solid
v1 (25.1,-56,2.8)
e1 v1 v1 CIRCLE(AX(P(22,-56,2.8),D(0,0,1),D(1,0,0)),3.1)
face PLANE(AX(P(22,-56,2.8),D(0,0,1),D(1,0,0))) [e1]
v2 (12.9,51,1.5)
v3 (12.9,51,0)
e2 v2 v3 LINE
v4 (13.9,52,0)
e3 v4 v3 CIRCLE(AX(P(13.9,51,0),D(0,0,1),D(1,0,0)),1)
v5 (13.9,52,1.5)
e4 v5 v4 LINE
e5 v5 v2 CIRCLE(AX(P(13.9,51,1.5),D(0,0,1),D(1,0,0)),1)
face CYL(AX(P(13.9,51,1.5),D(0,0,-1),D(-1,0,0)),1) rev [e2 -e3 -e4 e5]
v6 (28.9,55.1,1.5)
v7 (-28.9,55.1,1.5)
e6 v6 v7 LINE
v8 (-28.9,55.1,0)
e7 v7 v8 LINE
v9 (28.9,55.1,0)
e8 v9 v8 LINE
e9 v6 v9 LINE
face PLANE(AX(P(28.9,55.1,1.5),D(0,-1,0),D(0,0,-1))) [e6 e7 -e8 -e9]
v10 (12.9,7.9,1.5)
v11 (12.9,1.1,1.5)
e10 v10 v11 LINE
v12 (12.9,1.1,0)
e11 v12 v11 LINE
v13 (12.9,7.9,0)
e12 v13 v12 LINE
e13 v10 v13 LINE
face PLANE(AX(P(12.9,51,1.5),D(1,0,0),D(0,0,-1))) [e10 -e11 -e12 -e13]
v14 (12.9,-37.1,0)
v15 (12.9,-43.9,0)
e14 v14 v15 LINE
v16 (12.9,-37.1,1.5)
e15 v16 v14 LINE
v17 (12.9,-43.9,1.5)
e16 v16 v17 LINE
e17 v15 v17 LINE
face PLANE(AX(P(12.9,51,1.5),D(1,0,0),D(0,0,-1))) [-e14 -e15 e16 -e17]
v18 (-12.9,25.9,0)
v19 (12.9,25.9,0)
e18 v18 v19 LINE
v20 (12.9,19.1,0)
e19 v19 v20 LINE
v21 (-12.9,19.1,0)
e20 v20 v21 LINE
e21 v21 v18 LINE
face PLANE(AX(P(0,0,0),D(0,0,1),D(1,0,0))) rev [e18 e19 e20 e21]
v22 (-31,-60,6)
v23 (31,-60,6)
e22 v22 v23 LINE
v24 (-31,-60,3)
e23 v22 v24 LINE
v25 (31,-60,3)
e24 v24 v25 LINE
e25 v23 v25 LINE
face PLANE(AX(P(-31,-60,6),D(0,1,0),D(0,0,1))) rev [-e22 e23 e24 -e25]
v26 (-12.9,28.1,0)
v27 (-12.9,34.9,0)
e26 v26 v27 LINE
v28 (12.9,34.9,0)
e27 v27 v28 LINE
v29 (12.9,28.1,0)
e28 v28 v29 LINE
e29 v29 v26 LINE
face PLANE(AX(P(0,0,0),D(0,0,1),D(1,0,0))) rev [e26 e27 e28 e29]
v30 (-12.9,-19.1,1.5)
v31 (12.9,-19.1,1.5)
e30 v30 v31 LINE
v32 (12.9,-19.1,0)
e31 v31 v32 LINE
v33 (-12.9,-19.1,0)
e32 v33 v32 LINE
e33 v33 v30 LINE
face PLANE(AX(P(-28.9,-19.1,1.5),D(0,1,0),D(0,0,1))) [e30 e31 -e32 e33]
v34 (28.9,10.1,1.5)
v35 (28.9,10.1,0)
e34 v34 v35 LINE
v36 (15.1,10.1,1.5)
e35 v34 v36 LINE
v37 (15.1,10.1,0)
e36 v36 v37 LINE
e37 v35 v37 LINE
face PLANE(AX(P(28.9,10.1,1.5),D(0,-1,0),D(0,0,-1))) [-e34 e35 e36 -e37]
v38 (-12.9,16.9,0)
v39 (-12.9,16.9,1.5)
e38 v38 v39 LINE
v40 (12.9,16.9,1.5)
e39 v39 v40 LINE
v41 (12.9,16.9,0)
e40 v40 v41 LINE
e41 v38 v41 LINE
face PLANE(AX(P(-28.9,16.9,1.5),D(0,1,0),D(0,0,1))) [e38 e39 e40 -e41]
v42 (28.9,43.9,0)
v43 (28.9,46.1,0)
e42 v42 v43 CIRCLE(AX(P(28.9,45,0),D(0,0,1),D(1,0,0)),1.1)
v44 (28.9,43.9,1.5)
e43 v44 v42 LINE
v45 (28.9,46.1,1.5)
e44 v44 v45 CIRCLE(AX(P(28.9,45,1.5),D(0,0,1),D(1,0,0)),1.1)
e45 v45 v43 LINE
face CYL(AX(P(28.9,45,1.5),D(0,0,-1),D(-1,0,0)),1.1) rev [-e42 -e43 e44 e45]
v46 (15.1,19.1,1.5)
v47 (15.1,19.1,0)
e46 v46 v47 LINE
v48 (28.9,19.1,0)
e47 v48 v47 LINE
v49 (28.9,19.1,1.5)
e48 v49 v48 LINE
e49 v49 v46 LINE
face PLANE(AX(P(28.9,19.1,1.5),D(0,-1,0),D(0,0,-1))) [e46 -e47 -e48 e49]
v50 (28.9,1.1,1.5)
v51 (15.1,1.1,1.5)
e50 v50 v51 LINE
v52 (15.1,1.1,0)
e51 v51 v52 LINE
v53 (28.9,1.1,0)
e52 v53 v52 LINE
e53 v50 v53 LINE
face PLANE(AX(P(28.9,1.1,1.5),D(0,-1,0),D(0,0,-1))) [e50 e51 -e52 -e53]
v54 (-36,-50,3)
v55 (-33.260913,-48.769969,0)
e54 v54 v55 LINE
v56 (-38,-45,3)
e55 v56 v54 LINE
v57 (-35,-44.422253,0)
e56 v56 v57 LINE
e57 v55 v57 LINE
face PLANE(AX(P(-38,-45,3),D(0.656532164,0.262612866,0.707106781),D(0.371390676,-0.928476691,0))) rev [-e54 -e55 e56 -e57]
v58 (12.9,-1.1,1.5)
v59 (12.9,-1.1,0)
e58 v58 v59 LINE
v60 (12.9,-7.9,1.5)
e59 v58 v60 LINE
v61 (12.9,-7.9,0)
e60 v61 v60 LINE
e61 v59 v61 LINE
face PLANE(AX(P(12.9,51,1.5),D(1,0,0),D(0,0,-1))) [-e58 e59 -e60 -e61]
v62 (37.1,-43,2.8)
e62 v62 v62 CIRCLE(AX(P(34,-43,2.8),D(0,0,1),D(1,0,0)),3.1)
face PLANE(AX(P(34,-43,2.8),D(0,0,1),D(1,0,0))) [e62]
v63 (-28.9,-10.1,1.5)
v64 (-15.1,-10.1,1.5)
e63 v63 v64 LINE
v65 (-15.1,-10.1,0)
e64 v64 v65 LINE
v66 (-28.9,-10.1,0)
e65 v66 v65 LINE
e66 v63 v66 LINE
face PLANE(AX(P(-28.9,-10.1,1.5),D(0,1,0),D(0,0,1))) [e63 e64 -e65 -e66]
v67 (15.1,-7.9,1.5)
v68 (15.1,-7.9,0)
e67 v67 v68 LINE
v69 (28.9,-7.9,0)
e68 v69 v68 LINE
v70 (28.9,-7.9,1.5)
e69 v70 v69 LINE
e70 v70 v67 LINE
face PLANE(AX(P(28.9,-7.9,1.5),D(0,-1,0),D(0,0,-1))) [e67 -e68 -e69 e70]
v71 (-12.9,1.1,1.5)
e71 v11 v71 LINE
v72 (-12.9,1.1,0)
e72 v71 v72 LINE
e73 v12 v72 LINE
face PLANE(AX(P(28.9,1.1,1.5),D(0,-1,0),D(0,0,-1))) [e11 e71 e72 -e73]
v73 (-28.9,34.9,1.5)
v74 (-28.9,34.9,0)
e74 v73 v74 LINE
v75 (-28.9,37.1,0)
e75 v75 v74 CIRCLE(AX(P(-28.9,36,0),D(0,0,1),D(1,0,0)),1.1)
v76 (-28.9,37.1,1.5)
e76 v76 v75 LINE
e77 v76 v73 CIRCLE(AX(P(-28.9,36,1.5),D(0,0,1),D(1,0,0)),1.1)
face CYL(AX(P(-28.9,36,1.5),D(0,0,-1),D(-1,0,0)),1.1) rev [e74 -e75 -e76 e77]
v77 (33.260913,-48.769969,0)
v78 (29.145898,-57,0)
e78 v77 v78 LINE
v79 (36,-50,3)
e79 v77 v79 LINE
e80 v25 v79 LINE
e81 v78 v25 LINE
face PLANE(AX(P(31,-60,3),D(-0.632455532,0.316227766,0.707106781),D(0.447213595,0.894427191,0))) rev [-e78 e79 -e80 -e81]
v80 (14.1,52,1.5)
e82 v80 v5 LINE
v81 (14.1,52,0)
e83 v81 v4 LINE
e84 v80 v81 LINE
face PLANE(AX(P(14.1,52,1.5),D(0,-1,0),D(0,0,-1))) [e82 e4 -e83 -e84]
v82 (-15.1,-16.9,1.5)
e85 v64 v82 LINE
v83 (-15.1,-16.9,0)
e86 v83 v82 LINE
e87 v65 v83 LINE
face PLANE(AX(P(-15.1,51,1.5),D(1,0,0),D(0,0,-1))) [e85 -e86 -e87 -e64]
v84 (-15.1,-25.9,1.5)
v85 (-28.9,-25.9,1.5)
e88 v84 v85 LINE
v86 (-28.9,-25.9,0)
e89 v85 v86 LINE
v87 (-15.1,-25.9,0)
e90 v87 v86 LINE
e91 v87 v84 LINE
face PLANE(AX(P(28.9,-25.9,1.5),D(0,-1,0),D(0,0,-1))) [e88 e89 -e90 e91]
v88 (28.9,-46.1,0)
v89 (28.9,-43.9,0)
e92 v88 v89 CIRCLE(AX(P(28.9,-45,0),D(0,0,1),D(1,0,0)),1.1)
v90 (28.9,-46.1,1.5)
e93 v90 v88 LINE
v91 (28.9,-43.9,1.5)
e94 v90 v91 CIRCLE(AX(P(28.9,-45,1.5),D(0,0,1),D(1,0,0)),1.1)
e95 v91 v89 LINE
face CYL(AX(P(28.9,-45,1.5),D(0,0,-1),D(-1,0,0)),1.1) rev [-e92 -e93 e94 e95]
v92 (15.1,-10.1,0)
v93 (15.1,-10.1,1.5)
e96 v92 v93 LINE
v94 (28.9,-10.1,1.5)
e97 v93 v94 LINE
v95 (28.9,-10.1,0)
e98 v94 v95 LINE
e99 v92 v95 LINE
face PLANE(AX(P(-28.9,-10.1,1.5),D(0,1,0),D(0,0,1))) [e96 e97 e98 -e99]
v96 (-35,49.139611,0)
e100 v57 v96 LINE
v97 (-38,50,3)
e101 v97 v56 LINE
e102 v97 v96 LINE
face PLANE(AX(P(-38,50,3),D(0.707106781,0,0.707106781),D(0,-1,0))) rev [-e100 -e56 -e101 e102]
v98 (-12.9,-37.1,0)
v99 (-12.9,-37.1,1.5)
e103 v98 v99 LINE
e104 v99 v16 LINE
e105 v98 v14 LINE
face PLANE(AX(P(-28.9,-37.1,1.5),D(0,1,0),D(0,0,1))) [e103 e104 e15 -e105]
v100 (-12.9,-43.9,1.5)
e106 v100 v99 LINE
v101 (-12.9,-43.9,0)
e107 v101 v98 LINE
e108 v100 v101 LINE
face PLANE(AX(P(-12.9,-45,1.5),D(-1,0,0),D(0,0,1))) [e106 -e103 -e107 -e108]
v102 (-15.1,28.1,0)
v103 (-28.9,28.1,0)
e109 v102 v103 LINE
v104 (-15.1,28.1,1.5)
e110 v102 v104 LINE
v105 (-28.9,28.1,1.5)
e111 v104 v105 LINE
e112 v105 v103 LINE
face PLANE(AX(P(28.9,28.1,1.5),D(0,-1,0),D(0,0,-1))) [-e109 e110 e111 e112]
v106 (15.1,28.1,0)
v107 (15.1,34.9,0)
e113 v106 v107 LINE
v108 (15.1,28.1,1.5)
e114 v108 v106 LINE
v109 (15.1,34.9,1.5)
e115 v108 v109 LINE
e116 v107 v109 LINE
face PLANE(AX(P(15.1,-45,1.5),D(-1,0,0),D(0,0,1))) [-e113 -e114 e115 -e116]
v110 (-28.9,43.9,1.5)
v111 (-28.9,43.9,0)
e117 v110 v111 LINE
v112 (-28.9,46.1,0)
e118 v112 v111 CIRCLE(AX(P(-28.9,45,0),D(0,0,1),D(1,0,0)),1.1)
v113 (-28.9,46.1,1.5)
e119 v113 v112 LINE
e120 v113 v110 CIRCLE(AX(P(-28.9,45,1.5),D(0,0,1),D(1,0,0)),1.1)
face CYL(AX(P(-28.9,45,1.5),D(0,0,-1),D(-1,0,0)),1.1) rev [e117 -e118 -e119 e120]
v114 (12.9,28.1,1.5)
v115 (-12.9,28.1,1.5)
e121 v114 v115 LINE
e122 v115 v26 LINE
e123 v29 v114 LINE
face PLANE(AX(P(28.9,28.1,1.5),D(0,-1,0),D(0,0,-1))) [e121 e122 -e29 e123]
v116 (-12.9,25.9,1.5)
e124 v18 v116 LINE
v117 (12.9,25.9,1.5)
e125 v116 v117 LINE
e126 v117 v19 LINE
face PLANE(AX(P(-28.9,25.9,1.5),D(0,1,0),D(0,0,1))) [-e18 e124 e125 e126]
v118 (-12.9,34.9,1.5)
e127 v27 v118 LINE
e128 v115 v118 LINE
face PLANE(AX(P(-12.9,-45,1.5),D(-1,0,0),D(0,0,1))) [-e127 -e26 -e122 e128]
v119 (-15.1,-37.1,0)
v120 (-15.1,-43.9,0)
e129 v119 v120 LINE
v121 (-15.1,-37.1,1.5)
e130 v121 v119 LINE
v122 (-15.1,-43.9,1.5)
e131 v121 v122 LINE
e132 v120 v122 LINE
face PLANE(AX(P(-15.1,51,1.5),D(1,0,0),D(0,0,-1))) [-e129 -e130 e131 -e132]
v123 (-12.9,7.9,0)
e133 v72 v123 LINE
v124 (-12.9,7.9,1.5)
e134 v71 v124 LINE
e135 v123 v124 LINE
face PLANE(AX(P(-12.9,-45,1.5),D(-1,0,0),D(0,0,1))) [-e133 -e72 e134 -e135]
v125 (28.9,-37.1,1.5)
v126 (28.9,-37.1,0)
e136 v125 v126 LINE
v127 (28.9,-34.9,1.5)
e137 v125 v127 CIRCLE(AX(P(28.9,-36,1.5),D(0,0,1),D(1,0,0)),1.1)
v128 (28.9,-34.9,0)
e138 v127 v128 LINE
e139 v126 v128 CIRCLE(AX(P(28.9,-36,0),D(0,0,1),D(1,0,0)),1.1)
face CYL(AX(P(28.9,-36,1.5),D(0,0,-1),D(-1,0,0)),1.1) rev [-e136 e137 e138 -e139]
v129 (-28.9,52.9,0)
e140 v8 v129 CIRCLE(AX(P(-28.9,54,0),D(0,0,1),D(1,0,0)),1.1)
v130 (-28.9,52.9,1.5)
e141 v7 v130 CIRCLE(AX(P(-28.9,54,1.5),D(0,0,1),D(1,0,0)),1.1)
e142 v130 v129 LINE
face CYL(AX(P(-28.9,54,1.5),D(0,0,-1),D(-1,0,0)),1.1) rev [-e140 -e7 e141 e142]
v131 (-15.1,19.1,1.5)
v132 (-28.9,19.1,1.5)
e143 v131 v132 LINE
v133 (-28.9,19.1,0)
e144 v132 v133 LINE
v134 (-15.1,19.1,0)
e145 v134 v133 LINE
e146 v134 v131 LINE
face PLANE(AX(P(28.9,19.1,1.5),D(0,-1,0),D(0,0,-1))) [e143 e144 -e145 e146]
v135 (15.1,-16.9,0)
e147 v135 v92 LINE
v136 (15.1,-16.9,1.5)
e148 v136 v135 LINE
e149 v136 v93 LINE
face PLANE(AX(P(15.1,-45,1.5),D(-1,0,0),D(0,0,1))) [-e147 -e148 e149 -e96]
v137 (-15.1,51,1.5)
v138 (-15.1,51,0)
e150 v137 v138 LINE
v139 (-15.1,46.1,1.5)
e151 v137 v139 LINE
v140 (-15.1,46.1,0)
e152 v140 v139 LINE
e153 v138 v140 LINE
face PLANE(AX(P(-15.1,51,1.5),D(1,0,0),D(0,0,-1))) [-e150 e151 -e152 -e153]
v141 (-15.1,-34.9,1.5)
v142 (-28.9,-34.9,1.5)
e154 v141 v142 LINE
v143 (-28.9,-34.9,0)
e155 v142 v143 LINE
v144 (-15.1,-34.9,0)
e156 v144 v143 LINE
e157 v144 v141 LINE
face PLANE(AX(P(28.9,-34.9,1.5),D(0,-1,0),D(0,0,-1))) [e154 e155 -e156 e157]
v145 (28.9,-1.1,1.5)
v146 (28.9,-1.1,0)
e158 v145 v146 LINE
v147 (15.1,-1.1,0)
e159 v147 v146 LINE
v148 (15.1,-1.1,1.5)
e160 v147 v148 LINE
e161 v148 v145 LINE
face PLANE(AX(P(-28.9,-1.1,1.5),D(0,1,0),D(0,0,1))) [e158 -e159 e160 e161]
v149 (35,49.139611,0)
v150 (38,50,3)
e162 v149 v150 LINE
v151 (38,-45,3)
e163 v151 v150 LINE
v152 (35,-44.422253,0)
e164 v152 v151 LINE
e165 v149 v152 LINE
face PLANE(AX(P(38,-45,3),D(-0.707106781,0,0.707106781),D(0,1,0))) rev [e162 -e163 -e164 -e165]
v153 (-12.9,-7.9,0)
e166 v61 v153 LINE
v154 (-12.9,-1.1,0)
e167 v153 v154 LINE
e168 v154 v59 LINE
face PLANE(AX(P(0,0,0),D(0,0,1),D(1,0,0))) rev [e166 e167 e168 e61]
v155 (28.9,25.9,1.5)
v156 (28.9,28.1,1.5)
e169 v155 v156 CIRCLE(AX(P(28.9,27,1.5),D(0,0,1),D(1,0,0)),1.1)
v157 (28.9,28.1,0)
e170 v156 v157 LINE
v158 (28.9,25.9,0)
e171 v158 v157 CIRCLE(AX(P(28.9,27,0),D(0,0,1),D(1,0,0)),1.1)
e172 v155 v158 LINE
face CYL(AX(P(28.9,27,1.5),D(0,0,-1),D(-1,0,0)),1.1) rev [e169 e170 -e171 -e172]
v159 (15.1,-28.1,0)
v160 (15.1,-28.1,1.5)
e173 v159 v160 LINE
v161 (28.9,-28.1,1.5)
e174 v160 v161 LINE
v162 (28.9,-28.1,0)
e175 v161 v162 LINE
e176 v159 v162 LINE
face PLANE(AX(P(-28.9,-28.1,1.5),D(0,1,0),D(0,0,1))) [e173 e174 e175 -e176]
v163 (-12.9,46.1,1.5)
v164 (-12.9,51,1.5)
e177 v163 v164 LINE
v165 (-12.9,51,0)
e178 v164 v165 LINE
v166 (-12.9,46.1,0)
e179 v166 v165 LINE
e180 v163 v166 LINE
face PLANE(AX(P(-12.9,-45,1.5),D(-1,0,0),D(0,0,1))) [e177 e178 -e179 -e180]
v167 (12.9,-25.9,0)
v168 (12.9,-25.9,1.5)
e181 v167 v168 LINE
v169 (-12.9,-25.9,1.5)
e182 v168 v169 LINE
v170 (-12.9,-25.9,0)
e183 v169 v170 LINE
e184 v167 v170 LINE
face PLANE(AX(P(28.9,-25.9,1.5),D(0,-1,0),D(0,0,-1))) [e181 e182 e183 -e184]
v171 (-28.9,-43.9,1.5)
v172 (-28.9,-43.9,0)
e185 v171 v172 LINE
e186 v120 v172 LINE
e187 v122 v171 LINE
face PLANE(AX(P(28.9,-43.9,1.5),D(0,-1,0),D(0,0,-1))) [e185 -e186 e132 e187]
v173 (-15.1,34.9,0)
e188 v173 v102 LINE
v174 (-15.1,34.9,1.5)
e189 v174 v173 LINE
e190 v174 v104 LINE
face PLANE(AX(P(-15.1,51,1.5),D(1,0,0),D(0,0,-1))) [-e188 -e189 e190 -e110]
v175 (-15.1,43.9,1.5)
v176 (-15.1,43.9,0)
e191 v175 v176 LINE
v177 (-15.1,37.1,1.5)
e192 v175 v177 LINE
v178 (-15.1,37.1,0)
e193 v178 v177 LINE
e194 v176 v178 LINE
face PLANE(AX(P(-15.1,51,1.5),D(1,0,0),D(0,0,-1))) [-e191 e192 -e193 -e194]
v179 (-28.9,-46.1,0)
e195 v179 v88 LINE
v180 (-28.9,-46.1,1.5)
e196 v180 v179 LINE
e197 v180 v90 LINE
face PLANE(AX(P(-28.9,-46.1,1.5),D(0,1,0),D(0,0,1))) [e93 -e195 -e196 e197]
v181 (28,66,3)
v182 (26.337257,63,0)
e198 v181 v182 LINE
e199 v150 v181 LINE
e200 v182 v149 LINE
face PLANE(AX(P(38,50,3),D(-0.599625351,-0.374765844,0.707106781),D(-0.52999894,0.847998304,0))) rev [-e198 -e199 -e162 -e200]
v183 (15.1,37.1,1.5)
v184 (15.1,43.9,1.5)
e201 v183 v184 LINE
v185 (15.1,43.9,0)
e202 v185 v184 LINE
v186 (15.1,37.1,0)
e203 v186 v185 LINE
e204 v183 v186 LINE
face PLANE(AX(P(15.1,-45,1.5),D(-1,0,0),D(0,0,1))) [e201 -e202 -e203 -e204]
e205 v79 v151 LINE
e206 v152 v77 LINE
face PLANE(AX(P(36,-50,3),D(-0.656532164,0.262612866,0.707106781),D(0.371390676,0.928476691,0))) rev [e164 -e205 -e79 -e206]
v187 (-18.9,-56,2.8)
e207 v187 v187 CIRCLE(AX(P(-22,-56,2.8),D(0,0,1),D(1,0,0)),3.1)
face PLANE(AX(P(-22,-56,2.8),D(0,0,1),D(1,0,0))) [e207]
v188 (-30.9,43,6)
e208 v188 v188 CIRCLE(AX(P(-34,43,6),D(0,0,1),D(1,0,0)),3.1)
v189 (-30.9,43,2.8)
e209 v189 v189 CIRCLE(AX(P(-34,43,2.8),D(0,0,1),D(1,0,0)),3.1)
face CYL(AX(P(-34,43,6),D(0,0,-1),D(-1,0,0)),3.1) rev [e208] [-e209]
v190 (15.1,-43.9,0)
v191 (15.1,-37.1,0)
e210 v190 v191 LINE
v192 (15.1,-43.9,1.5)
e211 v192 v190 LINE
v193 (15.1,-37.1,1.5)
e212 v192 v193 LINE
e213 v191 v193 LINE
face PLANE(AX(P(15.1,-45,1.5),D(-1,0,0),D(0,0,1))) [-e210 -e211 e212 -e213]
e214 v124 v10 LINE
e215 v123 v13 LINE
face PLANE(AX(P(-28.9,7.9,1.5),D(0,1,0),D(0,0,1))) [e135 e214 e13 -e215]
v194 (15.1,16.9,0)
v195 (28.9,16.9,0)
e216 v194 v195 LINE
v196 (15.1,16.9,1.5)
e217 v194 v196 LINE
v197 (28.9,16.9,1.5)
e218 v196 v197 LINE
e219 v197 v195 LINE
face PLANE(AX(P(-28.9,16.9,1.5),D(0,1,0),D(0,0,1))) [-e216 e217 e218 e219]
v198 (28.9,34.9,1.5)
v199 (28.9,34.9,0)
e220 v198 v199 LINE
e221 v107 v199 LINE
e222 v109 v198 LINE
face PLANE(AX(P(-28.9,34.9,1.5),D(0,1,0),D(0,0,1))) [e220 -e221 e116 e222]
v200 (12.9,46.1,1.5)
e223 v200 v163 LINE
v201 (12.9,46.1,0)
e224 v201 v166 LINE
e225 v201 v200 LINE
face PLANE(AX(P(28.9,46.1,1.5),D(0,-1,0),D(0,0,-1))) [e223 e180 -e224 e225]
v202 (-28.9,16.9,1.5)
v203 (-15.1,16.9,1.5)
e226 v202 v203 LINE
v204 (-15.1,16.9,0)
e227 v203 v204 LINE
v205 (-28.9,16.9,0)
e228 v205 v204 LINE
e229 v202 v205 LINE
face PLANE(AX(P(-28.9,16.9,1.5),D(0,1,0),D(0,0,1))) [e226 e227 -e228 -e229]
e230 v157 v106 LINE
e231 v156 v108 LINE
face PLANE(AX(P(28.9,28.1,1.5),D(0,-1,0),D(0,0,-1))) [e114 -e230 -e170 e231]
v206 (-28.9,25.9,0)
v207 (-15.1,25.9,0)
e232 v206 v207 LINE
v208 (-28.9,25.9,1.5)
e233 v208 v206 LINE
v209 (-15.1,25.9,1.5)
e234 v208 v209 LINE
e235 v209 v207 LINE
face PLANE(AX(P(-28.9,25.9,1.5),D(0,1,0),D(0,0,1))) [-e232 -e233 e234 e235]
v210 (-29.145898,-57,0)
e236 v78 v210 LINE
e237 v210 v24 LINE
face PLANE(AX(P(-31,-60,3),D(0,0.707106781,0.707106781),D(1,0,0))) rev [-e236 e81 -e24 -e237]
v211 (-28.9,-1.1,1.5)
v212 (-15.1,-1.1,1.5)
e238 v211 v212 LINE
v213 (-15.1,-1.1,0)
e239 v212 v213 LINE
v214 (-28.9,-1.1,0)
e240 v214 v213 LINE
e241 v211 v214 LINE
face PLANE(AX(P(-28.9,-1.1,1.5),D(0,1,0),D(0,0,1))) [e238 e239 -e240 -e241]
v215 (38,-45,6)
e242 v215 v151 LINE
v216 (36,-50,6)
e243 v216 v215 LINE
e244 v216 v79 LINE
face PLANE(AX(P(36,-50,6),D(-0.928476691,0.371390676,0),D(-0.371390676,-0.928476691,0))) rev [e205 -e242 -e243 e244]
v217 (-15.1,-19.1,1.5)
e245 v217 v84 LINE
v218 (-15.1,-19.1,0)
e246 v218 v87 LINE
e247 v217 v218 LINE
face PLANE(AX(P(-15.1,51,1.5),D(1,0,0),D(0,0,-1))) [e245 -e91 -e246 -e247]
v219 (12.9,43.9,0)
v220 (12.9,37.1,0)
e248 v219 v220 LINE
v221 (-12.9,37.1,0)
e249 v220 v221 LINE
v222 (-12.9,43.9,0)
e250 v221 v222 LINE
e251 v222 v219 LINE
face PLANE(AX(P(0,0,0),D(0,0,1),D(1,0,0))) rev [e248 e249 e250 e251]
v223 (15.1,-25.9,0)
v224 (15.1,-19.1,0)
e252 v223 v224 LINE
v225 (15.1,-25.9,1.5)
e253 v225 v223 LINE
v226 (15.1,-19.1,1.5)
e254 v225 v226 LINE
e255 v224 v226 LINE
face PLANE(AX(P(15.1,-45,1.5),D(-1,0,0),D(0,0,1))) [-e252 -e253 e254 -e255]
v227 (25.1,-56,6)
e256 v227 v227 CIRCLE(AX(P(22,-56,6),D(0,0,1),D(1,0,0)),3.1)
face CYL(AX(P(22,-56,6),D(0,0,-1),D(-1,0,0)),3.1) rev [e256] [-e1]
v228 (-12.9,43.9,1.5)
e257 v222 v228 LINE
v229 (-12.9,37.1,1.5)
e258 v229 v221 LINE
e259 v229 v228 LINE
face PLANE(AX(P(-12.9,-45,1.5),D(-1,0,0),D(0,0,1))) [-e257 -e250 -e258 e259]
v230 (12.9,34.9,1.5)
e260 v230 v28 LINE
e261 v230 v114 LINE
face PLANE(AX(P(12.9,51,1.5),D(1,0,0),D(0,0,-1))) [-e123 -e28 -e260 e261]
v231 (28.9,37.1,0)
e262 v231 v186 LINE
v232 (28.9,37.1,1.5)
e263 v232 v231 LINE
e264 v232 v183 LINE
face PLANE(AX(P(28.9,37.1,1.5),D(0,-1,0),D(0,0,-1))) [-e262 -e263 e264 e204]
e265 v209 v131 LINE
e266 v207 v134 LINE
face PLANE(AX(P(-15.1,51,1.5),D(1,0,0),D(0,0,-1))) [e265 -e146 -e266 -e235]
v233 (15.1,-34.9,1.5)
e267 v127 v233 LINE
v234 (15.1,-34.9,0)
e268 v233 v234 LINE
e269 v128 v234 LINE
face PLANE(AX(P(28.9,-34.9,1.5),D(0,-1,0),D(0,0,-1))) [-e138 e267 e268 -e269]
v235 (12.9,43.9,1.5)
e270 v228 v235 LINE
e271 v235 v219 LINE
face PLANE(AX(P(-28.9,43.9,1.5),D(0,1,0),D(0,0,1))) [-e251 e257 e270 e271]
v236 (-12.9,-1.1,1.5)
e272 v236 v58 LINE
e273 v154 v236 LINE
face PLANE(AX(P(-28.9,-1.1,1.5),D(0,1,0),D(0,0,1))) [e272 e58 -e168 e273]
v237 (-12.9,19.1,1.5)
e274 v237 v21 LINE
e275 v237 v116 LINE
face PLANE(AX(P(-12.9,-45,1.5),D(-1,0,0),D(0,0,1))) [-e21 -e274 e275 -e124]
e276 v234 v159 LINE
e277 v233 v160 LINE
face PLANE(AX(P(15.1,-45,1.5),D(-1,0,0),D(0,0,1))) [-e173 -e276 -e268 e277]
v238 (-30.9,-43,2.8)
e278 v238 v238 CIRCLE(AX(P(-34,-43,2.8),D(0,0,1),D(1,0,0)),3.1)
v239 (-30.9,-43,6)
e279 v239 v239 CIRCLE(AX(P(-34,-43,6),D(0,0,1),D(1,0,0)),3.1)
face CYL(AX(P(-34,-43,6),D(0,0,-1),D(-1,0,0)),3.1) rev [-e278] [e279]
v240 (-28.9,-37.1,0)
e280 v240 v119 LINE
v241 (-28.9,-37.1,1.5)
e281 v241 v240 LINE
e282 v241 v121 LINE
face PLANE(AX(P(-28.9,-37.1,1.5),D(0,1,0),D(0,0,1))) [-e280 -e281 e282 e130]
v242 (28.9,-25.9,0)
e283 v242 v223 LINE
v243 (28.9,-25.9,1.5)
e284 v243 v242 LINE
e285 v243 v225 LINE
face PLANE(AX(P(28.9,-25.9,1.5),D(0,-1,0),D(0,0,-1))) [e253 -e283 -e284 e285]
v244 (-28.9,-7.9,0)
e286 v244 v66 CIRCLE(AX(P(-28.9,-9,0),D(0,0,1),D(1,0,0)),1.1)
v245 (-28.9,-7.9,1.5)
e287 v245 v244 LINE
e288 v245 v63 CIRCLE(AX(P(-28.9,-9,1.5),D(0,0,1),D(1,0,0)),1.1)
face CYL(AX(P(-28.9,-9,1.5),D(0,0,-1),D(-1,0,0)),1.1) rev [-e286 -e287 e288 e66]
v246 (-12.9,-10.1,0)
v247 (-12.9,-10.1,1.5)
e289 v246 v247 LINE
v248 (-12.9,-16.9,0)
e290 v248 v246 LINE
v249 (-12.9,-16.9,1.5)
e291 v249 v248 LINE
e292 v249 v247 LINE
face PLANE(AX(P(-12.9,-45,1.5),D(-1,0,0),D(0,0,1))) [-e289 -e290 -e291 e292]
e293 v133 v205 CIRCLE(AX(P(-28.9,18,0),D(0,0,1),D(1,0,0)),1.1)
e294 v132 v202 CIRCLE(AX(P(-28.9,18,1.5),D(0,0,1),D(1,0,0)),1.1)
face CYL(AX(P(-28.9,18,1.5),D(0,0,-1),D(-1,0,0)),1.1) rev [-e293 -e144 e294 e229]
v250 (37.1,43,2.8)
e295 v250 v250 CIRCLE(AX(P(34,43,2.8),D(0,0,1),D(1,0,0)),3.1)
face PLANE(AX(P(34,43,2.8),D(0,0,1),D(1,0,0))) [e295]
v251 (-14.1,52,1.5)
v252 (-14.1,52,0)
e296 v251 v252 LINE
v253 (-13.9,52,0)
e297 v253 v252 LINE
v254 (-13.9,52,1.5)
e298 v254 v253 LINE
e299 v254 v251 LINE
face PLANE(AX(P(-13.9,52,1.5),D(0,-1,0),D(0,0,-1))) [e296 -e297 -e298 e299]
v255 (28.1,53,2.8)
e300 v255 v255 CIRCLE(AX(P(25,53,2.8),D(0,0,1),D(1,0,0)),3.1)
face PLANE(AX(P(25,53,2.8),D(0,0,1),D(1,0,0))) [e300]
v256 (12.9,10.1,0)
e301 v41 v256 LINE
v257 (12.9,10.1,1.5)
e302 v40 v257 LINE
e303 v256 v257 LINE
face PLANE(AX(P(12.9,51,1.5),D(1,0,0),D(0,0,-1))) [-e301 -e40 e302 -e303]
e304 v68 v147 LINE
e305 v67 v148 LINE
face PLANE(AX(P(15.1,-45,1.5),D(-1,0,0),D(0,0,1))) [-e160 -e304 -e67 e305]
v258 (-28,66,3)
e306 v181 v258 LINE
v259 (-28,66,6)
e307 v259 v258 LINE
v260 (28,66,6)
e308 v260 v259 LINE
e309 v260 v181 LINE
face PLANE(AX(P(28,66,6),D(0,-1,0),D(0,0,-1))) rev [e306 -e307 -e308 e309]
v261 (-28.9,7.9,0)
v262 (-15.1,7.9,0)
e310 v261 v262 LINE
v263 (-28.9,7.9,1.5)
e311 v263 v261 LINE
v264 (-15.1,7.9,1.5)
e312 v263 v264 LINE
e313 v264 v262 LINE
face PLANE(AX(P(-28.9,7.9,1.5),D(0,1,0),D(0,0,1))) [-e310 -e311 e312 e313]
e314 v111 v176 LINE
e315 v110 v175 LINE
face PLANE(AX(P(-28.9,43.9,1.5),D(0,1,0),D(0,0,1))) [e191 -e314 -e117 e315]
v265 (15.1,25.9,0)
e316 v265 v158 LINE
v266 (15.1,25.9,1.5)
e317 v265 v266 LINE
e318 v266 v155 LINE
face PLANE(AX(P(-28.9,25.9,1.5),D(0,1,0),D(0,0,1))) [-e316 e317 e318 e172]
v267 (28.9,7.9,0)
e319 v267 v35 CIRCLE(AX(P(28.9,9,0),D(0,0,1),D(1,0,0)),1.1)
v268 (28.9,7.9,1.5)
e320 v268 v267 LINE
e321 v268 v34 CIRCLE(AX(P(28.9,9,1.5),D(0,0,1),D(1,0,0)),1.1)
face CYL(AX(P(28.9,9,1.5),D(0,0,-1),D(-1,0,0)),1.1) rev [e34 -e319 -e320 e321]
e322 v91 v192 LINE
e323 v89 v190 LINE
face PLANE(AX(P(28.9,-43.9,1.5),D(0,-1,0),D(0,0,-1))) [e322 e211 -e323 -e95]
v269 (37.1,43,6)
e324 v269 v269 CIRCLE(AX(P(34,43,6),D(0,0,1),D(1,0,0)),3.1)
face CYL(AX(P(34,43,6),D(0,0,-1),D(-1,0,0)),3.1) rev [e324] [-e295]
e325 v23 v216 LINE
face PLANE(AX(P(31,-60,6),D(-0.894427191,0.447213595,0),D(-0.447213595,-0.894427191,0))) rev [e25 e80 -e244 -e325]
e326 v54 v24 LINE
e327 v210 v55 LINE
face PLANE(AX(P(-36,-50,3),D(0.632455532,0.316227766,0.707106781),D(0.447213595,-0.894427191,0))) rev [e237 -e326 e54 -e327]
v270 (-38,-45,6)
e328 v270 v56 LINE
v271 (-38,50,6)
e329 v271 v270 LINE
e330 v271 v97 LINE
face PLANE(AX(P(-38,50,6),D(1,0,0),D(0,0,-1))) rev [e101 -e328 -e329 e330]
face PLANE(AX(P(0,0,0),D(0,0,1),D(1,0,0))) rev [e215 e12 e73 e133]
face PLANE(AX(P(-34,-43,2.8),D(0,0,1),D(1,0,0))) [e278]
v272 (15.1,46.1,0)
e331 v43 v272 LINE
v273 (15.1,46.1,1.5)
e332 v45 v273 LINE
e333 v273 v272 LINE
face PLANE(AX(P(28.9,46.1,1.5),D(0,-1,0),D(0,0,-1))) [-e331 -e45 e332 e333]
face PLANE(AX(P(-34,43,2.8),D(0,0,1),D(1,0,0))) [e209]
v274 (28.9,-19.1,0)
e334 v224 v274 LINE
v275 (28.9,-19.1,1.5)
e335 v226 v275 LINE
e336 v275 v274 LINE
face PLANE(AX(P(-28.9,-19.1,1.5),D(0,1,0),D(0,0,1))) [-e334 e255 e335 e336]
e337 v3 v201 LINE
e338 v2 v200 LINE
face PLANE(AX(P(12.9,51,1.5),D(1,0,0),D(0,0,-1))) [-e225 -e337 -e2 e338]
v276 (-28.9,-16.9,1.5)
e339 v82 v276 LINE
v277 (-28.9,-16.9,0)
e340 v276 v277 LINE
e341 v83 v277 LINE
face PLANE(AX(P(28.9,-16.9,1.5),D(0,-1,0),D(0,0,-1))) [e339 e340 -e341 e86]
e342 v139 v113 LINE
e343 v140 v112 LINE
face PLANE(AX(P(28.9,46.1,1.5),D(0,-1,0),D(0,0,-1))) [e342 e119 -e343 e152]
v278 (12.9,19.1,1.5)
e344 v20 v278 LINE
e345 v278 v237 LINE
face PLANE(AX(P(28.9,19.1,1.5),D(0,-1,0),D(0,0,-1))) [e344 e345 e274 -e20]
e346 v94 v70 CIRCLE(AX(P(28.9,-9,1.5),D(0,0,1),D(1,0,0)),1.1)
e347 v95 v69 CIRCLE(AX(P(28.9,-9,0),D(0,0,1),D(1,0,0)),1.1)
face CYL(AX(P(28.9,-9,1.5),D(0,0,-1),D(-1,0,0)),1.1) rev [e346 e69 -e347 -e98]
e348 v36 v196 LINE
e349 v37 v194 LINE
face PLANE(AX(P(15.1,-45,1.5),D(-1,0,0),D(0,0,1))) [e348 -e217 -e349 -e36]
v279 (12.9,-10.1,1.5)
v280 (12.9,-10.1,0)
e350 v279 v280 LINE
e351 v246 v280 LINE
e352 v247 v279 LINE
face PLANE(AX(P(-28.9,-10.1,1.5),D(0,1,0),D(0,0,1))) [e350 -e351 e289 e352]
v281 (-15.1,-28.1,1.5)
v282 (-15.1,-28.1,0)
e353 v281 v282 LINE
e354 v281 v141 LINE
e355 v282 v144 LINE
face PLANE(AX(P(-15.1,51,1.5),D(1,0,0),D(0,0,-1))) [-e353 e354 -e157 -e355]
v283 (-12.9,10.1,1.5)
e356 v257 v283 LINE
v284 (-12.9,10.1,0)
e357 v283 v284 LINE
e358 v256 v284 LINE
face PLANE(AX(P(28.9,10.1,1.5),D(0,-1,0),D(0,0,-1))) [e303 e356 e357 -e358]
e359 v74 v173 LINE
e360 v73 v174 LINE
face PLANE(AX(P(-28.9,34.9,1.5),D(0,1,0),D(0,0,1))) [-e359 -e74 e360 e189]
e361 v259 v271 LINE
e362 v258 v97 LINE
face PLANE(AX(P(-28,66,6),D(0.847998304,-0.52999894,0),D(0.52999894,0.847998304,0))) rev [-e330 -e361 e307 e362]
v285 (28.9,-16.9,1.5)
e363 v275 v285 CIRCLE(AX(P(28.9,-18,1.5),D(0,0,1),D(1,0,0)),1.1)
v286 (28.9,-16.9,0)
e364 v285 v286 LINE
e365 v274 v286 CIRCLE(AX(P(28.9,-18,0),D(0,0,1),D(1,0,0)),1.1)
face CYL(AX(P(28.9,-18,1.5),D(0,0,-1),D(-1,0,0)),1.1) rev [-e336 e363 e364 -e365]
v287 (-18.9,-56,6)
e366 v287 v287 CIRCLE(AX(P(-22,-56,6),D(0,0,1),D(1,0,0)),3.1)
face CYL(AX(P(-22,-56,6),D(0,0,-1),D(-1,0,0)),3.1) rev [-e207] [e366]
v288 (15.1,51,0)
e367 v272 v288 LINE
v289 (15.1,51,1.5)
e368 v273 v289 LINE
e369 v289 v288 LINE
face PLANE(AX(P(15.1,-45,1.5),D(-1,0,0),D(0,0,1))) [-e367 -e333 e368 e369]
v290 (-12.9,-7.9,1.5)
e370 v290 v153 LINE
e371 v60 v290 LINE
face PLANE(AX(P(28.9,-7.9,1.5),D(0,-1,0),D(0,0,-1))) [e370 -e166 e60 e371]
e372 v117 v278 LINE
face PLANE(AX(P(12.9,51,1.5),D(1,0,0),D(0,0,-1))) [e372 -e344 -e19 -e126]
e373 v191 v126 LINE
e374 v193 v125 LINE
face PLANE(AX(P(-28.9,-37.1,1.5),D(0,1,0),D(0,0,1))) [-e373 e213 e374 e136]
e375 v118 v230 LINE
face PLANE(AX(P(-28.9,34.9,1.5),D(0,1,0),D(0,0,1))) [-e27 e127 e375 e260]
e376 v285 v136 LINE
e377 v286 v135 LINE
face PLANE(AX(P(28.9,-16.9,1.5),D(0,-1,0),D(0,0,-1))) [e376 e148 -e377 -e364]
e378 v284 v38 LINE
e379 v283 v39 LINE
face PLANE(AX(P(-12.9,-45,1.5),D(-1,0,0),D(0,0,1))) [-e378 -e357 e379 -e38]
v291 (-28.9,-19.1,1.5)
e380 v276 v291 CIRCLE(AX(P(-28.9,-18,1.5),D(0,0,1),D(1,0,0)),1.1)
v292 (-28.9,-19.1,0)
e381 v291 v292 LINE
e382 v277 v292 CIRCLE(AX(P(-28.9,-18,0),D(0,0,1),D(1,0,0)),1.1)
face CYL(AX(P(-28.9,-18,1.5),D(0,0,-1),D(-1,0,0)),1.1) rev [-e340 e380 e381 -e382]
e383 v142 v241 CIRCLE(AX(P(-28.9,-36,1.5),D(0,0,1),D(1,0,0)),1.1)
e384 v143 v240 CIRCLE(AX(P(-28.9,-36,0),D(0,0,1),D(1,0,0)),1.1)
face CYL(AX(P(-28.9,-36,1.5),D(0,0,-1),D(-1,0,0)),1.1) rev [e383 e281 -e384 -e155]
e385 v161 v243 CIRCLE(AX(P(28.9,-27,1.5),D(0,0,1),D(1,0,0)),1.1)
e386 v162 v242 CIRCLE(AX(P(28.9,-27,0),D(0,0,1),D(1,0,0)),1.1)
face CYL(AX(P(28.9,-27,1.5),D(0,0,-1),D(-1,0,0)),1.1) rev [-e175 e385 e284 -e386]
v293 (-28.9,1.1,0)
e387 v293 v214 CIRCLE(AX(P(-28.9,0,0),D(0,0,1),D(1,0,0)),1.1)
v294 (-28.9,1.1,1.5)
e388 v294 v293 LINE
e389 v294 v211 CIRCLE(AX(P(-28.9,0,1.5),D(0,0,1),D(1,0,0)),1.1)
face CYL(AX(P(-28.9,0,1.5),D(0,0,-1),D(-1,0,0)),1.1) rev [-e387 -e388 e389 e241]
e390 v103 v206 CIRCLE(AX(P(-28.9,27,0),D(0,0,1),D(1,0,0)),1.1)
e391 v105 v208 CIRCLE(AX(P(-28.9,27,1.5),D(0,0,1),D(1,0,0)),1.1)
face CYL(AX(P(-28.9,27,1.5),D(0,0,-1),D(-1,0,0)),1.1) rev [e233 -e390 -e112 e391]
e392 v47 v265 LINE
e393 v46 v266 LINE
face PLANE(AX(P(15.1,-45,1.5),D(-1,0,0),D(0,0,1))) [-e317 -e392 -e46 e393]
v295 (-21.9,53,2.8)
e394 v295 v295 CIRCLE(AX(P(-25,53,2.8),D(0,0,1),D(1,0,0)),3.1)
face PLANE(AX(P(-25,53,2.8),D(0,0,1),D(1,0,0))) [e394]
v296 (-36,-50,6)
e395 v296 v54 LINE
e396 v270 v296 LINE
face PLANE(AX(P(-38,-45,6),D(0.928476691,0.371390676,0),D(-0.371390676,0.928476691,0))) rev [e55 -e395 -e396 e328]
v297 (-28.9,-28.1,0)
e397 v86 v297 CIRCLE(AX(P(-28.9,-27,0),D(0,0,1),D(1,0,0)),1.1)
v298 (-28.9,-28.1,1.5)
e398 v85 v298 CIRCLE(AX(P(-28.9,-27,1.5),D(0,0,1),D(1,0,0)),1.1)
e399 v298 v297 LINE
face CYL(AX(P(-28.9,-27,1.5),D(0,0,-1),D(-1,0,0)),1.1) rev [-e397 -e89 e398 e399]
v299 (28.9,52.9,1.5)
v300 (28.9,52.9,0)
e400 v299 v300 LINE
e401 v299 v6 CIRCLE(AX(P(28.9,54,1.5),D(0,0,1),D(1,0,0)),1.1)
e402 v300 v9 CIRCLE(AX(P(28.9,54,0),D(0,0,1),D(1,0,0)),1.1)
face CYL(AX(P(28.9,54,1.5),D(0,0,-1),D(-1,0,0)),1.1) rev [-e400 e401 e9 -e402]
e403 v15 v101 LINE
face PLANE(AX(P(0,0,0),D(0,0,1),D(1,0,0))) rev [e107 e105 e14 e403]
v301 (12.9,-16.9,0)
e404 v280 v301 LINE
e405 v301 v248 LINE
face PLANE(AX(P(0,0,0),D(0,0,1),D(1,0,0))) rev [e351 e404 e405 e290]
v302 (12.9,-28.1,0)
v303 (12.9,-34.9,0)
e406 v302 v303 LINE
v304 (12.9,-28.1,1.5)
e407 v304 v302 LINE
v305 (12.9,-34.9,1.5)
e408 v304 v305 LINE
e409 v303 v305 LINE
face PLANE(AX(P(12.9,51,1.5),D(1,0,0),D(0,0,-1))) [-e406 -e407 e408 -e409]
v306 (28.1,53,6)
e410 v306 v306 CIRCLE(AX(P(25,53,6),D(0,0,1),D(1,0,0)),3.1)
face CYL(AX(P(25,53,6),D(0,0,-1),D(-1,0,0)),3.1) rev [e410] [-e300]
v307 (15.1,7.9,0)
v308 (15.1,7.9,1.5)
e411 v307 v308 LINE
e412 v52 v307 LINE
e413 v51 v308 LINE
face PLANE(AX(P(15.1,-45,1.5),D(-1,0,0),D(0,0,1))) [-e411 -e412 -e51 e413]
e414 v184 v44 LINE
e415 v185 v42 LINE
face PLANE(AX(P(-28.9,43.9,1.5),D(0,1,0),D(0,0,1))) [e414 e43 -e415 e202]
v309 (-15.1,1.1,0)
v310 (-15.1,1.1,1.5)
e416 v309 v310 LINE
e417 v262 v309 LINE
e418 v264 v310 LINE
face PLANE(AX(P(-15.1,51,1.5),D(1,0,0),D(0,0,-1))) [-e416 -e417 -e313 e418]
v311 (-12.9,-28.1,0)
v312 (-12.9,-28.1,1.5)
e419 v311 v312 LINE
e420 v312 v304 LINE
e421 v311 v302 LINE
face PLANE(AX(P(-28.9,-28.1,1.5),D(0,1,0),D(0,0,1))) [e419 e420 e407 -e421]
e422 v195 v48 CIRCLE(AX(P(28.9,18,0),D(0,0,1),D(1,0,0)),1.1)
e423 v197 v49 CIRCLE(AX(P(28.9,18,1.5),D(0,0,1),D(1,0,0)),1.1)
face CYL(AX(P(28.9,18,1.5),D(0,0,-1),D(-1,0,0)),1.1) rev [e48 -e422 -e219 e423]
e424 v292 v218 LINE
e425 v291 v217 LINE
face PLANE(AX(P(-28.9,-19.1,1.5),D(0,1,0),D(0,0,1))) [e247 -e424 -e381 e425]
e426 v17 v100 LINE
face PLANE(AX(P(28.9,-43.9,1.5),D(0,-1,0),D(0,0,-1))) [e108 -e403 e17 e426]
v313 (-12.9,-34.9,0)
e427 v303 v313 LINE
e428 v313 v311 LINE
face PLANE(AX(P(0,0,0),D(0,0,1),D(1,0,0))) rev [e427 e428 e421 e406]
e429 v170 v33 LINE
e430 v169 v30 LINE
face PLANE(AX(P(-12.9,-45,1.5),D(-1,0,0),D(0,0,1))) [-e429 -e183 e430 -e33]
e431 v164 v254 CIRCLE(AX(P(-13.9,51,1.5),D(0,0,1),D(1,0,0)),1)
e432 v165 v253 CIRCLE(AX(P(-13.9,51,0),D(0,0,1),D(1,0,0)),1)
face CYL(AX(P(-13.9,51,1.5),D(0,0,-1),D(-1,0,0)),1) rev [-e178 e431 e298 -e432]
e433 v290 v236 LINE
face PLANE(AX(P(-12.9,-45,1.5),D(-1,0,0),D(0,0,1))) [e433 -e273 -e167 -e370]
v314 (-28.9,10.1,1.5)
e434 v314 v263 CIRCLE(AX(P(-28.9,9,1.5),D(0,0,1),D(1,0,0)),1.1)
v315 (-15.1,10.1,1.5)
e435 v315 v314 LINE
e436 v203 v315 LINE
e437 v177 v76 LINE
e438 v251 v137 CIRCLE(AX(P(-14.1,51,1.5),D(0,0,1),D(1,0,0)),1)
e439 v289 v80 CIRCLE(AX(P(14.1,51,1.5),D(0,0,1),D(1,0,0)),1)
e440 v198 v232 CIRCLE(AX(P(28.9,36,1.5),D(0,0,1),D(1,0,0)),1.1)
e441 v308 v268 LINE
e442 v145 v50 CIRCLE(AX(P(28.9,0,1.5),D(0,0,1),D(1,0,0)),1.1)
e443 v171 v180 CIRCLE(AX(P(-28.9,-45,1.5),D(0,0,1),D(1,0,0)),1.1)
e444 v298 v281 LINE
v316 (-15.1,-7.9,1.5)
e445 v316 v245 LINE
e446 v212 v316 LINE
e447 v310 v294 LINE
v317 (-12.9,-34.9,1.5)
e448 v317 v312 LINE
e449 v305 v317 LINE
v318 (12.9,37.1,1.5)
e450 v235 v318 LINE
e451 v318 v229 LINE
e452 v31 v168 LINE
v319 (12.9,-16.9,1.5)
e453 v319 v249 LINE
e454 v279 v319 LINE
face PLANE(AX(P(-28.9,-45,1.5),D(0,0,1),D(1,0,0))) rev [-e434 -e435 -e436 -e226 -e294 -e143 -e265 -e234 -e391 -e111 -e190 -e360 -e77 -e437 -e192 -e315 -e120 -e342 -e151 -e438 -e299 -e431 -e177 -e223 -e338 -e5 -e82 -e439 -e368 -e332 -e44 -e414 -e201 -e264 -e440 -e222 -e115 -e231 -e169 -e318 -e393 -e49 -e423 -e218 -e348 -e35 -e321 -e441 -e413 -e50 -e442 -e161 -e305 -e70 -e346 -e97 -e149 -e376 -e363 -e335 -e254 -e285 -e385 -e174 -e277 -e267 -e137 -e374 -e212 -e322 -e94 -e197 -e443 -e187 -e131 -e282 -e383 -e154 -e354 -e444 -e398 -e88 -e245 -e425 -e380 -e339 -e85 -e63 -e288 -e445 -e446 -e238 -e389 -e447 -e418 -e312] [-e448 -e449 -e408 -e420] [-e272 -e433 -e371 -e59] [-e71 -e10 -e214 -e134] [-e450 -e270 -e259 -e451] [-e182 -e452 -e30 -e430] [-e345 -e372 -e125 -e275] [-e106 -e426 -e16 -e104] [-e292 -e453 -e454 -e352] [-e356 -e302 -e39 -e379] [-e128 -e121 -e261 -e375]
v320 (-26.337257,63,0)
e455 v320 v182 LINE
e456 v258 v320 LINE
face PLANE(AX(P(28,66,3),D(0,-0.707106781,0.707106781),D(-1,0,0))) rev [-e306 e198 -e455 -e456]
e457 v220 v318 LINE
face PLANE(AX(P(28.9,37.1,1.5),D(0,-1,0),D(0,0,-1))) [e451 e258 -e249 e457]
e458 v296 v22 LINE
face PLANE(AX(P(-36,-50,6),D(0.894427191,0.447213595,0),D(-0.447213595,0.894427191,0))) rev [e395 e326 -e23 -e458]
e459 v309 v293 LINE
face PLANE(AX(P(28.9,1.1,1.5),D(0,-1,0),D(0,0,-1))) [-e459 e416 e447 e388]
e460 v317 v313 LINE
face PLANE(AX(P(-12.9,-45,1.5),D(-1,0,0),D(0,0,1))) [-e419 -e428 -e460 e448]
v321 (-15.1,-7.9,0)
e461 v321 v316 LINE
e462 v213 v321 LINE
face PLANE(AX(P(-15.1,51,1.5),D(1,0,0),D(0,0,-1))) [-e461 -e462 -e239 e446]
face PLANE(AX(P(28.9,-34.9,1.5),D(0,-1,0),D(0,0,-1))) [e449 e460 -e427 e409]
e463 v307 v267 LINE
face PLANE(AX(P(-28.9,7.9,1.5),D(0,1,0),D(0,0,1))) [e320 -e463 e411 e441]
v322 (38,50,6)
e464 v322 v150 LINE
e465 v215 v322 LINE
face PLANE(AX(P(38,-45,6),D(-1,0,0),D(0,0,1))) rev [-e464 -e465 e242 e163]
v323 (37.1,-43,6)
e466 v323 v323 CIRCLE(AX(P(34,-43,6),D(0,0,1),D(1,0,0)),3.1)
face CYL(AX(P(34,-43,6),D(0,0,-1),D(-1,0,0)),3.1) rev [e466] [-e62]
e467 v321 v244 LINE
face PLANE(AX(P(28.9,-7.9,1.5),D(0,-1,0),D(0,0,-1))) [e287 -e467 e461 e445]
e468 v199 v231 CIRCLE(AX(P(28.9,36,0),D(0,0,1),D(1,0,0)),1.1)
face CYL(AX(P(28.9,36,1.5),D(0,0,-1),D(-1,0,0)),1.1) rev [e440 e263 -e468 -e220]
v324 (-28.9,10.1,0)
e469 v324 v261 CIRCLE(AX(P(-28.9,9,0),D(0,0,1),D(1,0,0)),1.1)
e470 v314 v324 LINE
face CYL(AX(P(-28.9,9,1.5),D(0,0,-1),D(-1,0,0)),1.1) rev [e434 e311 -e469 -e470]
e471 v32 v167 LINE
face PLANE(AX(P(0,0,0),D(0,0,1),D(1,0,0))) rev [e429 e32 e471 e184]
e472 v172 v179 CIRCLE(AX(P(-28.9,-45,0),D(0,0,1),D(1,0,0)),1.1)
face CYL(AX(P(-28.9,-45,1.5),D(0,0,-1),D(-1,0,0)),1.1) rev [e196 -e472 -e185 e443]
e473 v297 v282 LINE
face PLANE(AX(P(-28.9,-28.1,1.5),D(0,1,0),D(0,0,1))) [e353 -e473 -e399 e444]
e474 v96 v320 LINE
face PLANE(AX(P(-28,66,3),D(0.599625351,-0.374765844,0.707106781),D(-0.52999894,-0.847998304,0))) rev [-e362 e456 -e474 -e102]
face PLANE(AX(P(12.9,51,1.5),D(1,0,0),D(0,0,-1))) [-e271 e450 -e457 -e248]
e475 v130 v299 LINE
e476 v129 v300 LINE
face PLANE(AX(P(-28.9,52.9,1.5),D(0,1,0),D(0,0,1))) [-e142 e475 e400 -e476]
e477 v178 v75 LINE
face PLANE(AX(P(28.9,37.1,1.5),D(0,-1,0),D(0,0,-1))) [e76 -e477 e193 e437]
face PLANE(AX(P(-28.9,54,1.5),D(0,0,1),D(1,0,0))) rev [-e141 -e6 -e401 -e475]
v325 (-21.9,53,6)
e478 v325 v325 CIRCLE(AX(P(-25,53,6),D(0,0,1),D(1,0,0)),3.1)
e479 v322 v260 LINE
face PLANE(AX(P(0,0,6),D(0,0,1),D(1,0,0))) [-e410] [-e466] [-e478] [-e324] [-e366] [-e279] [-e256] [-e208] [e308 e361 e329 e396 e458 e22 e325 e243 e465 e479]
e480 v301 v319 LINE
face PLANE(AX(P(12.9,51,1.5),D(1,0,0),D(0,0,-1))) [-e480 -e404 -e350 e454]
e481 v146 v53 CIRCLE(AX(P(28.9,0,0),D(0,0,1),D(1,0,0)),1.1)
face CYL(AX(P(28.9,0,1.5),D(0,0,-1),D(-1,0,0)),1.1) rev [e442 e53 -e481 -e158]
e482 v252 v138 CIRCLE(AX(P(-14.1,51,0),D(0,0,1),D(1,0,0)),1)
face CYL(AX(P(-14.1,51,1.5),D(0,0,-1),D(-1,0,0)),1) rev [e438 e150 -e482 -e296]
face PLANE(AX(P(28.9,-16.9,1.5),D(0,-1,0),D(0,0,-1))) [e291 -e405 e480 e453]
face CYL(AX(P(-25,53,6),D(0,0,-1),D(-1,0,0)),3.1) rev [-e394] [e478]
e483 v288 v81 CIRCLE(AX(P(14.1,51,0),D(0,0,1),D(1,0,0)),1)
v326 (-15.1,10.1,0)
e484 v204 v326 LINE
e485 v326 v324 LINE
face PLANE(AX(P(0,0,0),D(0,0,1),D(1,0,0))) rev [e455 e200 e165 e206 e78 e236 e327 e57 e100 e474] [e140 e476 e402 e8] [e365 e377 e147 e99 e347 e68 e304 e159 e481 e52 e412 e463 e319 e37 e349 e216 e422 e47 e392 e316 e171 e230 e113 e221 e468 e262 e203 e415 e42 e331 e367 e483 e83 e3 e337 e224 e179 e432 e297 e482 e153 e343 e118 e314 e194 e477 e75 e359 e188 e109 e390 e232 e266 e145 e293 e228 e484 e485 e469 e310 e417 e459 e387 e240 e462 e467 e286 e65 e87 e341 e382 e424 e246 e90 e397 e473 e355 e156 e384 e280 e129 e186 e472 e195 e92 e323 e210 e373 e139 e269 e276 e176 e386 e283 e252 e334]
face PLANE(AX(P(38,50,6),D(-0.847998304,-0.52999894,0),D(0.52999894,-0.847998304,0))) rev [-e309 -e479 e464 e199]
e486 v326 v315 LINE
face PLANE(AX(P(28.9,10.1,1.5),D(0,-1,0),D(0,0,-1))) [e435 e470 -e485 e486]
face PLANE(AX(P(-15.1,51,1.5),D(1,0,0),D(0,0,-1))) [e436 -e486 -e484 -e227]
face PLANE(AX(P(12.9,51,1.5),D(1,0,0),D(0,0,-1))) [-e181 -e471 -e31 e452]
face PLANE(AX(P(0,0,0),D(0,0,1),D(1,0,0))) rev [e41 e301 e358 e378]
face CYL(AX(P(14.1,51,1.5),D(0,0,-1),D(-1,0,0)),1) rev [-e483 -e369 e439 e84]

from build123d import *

# Parameters (mm, degrees)
EXTRUDE_246_DEPTH       = 6
CHAMFER_C3_SIZE         = 3
CUT_EXTRUDE_9_1P5_DEPTH = 1.5
CUT_EXTRUDE_1P5_DEPTH   = 1.5
CUT_EXTRUDE_START       = 2.8
SKETCH_4_R              = 3.1
CUT_EXTRUDE_2P8_DEPTH   = 3.2


with BuildPart() as part:
    # 草图1 → Extrude 246 (new body)
    with BuildSketch(Plane.XY):
        Polygon((-31, -60), (31, -60), (36, -50), (38, -45), (38, 50), (28, 66), (-28, 66), (-38, 50), (-38, -45), (-36, -50), align=None)
    extrude(amount=EXTRUDE_246_DEPTH)

    # 橡胶垫全周向心倒角_C3
    # the kernel refuses this chamfer: 3 mm, written as the material it takes off along each edge
    with BuildSketch(Plane(origin=(-40.865297253, -37.836756868, 0), x_dir=(-0.025529280528386825, -0.01021171221135473, 0.9996219169112968), z_dir=(0.3713906763541037, -0.9284766908852594, 0)), Plane(origin=(33.134702747, -57.163243132, 0), x_dir=(0.025529280528386825, -0.01021171221135473, 0.9996219169112968), z_dir=(0.3713906763541037, 0.9284766908852594, 0))) as chamfer_c3_piece_1:
        Polygon((CHAMFER_C3_SIZE * 0.999621916911, -CHAMFER_C3_SIZE * 0.0274958766106), (-CHAMFER_C3_SIZE * 0.0274958766106, -CHAMFER_C3_SIZE * 0.999621916911), (0, 0), align=None)
    extrude(amount=20.815262735, mode=Mode.SUBTRACT)
    with BuildSketch(Plane(origin=(-38, 57.715048964, 0), x_dir=(-0.027495876610586778, 0, 0.9996219169112968), z_dir=(0, -1, 0)), Plane(origin=(38, -52.715048964, 0), x_dir=(0.027495876610586778, 0, 0.9996219169112968), z_dir=(0, 1, 0))) as chamfer_c3_piece_2:
        Polygon((CHAMFER_C3_SIZE * 0.999621916911, -CHAMFER_C3_SIZE * 0.0274958766106), (-CHAMFER_C3_SIZE * 0.0274958766106, -CHAMFER_C3_SIZE * 0.999621916911), (0, 0), align=None)
    extrude(amount=110.430097928, mode=Mode.SUBTRACT)
    with BuildSketch(Plane(origin=(-23.911032227, 72.542348437, 0), x_dir=(-0.023316456732911096, 0.014572785458069436, 0.9996219169112968), z_dir=(-0.52999894000318, -0.847998304005088, 0)), Plane(origin=(42.088967773, 43.457651563, 0), x_dir=(0.02331645673290944, 0.014572785458068402, 0.9996219169112968), z_dir=(-0.52999894000318, 0.847998304005088, 0))) as chamfer_c3_piece_3:
        Polygon((CHAMFER_C3_SIZE * 0.999621916911, -CHAMFER_C3_SIZE * 0.0274958766106), (-CHAMFER_C3_SIZE * 0.0274958766106, -CHAMFER_C3_SIZE * 0.999621916911), (0, 0), align=None)
    extrude(amount=34.298060192, mode=Mode.SUBTRACT)
    with BuildSketch(Plane(origin=(35.715048964, 66, 0), x_dir=(0, 0.027495876610586778, 0.9996219169112968), z_dir=(-1, 0, 0))) as chamfer_c3_piece_4:
        Polygon((CHAMFER_C3_SIZE * 0.999621916911, -CHAMFER_C3_SIZE * 0.0274958766106), (-CHAMFER_C3_SIZE * 0.0274958766106, -CHAMFER_C3_SIZE * 0.999621916911), (0, 0), align=None)
    extrude(amount=71.430097928, mode=Mode.SUBTRACT)
    with BuildSketch(Plane(origin=(27.549725213, -66.900549573, 0), x_dir=(0.024593059680886438, -0.012296529840443219, 0.9996219169112968), z_dir=(0.447213595499958, 0.894427190999916, 0)), Plane(origin=(-39.450274787, -43.099450427, 0), x_dir=(-0.024593059680884596, -0.012296529840442298, 0.9996219169112968), z_dir=(0.447213595499958, -0.894427190999916, 0))) as chamfer_c3_piece_5:
        Polygon((CHAMFER_C3_SIZE * 0.999621916911, -CHAMFER_C3_SIZE * 0.0274958766106), (-CHAMFER_C3_SIZE * 0.0274958766106, -CHAMFER_C3_SIZE * 0.999621916911), (0, 0), align=None)
    extrude(amount=26.610437815, mode=Mode.SUBTRACT)
    with BuildSketch(Plane(origin=(-38.715048964, -60, 0), x_dir=(0, -0.027495876610586778, 0.9996219169112968), z_dir=(1, 0, 0))) as chamfer_c3_piece_6:
        Polygon((CHAMFER_C3_SIZE * 0.999621916911, -CHAMFER_C3_SIZE * 0.0274958766106), (-CHAMFER_C3_SIZE * 0.0274958766106, -CHAMFER_C3_SIZE * 0.999621916911), (0, 0), align=None)
    extrude(amount=77.430097928, mode=Mode.SUBTRACT)

    # 草图2 → 鞋底横向等距防滑槽_节距9_深1p5 (cut)
    with BuildSketch(Plane.XY):
        with BuildLine():
            Line((-28.9, -46.1), (28.9, -46.1))
            ThreePointArc((28.9, -46.1), (30, -45), (28.9, -43.9))
            Line((28.9, -43.9), (-28.9, -43.9))
            ThreePointArc((-28.9, -43.9), (-30, -45), (-28.9, -46.1))
        make_face()
        with BuildLine():
            Line((-28.9, -37.1), (28.9, -37.1))
            ThreePointArc((28.9, -37.1), (30, -36), (28.9, -34.9))
            Line((28.9, -34.9), (-28.9, -34.9))
            ThreePointArc((-28.9, -34.9), (-30, -36), (-28.9, -37.1))
        make_face()
        with BuildLine():
            Line((-28.9, -28.1), (28.9, -28.1))
            ThreePointArc((28.9, -28.1), (30, -27), (28.9, -25.9))
            Line((28.9, -25.9), (-28.9, -25.9))
            ThreePointArc((-28.9, -25.9), (-30, -27), (-28.9, -28.1))
        make_face()
        with BuildLine():
            Line((-28.9, -19.1), (28.9, -19.1))
            ThreePointArc((28.9, -19.1), (30, -18), (28.9, -16.9))
            Line((28.9, -16.9), (-28.9, -16.9))
            ThreePointArc((-28.9, -16.9), (-30, -18), (-28.9, -19.1))
        make_face()
        with BuildLine():
            Line((-28.9, -10.1), (28.9, -10.1))
            ThreePointArc((28.9, -10.1), (30, -9), (28.9, -7.9))
            Line((28.9, -7.9), (-28.9, -7.9))
            ThreePointArc((-28.9, -7.9), (-30, -9), (-28.9, -10.1))
        make_face()
        with BuildLine():
            Line((-28.9, -1.1), (28.9, -1.1))
            ThreePointArc((28.9, -1.1), (30, 0), (28.9, 1.1))
            Line((28.9, 1.1), (-28.9, 1.1))
            ThreePointArc((-28.9, 1.1), (-30, 0), (-28.9, -1.1))
        make_face()
        with BuildLine():
            Line((-28.9, 7.9), (28.9, 7.9))
            ThreePointArc((28.9, 7.9), (30, 9), (28.9, 10.1))
            Line((28.9, 10.1), (-28.9, 10.1))
            ThreePointArc((-28.9, 10.1), (-30, 9), (-28.9, 7.9))
        make_face()
        with BuildLine():
            Line((-28.9, 16.9), (28.9, 16.9))
            ThreePointArc((28.9, 16.9), (30, 18), (28.9, 19.1))
            Line((28.9, 19.1), (-28.9, 19.1))
            ThreePointArc((-28.9, 19.1), (-30, 18), (-28.9, 16.9))
        make_face()
        with BuildLine():
            Line((-28.9, 25.9), (28.9, 25.9))
            ThreePointArc((28.9, 25.9), (30, 27), (28.9, 28.1))
            Line((28.9, 28.1), (-28.9, 28.1))
            ThreePointArc((-28.9, 28.1), (-30, 27), (-28.9, 25.9))
        make_face()
        with BuildLine():
            Line((-28.9, 34.9), (28.9, 34.9))
            ThreePointArc((28.9, 34.9), (30, 36), (28.9, 37.1))
            Line((28.9, 37.1), (-28.9, 37.1))
            ThreePointArc((-28.9, 37.1), (-30, 36), (-28.9, 34.9))
        make_face()
        with BuildLine():
            Line((-28.9, 43.9), (28.9, 43.9))
            ThreePointArc((28.9, 43.9), (30, 45), (28.9, 46.1))
            Line((28.9, 46.1), (-28.9, 46.1))
            ThreePointArc((-28.9, 46.1), (-30, 45), (-28.9, 43.9))
        make_face()
        with BuildLine():
            Line((-28.9, 52.9), (28.9, 52.9))
            ThreePointArc((28.9, 52.9), (30, 54), (28.9, 55.1))
            Line((28.9, 55.1), (-28.9, 55.1))
            ThreePointArc((-28.9, 55.1), (-30, 54), (-28.9, 52.9))
        make_face()
    extrude(amount=CUT_EXTRUDE_9_1P5_DEPTH, mode=Mode.SUBTRACT)

    # 草图3 → 鞋底纵向分区槽_深1p5 (cut)
    with BuildSketch(Plane.XY):
        with BuildLine():
            Line((-14.1, -46), (-13.9, -46))
            ThreePointArc((-13.9, -46), (-13.192893219, -45.707106781), (-12.9, -45))
            Line((-12.9, -45), (-12.9, 51))
            ThreePointArc((-12.9, 51), (-13.192893219, 51.707106781), (-13.9, 52))
            Line((-13.9, 52), (-14.1, 52))
            ThreePointArc((-14.1, 52), (-14.807106781, 51.707106781), (-15.1, 51))
            Line((-15.1, 51), (-15.1, -45))
            ThreePointArc((-15.1, -45), (-14.807106781, -45.707106781), (-14.1, -46))
        make_face()
        with BuildLine():
            Line((13.9, -46), (14.1, -46))
            ThreePointArc((14.1, -46), (14.807106781, -45.707106781), (15.1, -45))
            Line((15.1, -45), (15.1, 51))
            ThreePointArc((15.1, 51), (14.807106781, 51.707106781), (14.1, 52))
            Line((14.1, 52), (13.9, 52))
            ThreePointArc((13.9, 52), (13.192893219, 51.707106781), (12.9, 51))
            Line((12.9, 51), (12.9, -45))
            ThreePointArc((12.9, -45), (13.192893219, -45.707106781), (13.9, -46))
        make_face()
    extrude(amount=CUT_EXTRUDE_1P5_DEPTH, mode=Mode.SUBTRACT)

    # 草图4 → 底部螺钉头背面避让_保留2p8底厚 (cut)
    with BuildSketch(Plane.XY.offset(CUT_EXTRUDE_START)):
        with Locations((-22, -56)):
            Circle(SKETCH_4_R)
        with Locations((-25, 53)):
            Circle(SKETCH_4_R)
        with Locations((-34, -43)):
            Circle(SKETCH_4_R)
        with Locations((-34, 43)):
            Circle(SKETCH_4_R)
        with Locations((22, -56)):
            Circle(SKETCH_4_R)
        with Locations((25, 53)):
            Circle(SKETCH_4_R)
        with Locations((34, -43)):
            Circle(SKETCH_4_R)
        with Locations((34, 43)):
            Circle(SKETCH_4_R)
    extrude(amount=CUT_EXTRUDE_2P8_DEPTH, mode=Mode.SUBTRACT)


solid = part.part
